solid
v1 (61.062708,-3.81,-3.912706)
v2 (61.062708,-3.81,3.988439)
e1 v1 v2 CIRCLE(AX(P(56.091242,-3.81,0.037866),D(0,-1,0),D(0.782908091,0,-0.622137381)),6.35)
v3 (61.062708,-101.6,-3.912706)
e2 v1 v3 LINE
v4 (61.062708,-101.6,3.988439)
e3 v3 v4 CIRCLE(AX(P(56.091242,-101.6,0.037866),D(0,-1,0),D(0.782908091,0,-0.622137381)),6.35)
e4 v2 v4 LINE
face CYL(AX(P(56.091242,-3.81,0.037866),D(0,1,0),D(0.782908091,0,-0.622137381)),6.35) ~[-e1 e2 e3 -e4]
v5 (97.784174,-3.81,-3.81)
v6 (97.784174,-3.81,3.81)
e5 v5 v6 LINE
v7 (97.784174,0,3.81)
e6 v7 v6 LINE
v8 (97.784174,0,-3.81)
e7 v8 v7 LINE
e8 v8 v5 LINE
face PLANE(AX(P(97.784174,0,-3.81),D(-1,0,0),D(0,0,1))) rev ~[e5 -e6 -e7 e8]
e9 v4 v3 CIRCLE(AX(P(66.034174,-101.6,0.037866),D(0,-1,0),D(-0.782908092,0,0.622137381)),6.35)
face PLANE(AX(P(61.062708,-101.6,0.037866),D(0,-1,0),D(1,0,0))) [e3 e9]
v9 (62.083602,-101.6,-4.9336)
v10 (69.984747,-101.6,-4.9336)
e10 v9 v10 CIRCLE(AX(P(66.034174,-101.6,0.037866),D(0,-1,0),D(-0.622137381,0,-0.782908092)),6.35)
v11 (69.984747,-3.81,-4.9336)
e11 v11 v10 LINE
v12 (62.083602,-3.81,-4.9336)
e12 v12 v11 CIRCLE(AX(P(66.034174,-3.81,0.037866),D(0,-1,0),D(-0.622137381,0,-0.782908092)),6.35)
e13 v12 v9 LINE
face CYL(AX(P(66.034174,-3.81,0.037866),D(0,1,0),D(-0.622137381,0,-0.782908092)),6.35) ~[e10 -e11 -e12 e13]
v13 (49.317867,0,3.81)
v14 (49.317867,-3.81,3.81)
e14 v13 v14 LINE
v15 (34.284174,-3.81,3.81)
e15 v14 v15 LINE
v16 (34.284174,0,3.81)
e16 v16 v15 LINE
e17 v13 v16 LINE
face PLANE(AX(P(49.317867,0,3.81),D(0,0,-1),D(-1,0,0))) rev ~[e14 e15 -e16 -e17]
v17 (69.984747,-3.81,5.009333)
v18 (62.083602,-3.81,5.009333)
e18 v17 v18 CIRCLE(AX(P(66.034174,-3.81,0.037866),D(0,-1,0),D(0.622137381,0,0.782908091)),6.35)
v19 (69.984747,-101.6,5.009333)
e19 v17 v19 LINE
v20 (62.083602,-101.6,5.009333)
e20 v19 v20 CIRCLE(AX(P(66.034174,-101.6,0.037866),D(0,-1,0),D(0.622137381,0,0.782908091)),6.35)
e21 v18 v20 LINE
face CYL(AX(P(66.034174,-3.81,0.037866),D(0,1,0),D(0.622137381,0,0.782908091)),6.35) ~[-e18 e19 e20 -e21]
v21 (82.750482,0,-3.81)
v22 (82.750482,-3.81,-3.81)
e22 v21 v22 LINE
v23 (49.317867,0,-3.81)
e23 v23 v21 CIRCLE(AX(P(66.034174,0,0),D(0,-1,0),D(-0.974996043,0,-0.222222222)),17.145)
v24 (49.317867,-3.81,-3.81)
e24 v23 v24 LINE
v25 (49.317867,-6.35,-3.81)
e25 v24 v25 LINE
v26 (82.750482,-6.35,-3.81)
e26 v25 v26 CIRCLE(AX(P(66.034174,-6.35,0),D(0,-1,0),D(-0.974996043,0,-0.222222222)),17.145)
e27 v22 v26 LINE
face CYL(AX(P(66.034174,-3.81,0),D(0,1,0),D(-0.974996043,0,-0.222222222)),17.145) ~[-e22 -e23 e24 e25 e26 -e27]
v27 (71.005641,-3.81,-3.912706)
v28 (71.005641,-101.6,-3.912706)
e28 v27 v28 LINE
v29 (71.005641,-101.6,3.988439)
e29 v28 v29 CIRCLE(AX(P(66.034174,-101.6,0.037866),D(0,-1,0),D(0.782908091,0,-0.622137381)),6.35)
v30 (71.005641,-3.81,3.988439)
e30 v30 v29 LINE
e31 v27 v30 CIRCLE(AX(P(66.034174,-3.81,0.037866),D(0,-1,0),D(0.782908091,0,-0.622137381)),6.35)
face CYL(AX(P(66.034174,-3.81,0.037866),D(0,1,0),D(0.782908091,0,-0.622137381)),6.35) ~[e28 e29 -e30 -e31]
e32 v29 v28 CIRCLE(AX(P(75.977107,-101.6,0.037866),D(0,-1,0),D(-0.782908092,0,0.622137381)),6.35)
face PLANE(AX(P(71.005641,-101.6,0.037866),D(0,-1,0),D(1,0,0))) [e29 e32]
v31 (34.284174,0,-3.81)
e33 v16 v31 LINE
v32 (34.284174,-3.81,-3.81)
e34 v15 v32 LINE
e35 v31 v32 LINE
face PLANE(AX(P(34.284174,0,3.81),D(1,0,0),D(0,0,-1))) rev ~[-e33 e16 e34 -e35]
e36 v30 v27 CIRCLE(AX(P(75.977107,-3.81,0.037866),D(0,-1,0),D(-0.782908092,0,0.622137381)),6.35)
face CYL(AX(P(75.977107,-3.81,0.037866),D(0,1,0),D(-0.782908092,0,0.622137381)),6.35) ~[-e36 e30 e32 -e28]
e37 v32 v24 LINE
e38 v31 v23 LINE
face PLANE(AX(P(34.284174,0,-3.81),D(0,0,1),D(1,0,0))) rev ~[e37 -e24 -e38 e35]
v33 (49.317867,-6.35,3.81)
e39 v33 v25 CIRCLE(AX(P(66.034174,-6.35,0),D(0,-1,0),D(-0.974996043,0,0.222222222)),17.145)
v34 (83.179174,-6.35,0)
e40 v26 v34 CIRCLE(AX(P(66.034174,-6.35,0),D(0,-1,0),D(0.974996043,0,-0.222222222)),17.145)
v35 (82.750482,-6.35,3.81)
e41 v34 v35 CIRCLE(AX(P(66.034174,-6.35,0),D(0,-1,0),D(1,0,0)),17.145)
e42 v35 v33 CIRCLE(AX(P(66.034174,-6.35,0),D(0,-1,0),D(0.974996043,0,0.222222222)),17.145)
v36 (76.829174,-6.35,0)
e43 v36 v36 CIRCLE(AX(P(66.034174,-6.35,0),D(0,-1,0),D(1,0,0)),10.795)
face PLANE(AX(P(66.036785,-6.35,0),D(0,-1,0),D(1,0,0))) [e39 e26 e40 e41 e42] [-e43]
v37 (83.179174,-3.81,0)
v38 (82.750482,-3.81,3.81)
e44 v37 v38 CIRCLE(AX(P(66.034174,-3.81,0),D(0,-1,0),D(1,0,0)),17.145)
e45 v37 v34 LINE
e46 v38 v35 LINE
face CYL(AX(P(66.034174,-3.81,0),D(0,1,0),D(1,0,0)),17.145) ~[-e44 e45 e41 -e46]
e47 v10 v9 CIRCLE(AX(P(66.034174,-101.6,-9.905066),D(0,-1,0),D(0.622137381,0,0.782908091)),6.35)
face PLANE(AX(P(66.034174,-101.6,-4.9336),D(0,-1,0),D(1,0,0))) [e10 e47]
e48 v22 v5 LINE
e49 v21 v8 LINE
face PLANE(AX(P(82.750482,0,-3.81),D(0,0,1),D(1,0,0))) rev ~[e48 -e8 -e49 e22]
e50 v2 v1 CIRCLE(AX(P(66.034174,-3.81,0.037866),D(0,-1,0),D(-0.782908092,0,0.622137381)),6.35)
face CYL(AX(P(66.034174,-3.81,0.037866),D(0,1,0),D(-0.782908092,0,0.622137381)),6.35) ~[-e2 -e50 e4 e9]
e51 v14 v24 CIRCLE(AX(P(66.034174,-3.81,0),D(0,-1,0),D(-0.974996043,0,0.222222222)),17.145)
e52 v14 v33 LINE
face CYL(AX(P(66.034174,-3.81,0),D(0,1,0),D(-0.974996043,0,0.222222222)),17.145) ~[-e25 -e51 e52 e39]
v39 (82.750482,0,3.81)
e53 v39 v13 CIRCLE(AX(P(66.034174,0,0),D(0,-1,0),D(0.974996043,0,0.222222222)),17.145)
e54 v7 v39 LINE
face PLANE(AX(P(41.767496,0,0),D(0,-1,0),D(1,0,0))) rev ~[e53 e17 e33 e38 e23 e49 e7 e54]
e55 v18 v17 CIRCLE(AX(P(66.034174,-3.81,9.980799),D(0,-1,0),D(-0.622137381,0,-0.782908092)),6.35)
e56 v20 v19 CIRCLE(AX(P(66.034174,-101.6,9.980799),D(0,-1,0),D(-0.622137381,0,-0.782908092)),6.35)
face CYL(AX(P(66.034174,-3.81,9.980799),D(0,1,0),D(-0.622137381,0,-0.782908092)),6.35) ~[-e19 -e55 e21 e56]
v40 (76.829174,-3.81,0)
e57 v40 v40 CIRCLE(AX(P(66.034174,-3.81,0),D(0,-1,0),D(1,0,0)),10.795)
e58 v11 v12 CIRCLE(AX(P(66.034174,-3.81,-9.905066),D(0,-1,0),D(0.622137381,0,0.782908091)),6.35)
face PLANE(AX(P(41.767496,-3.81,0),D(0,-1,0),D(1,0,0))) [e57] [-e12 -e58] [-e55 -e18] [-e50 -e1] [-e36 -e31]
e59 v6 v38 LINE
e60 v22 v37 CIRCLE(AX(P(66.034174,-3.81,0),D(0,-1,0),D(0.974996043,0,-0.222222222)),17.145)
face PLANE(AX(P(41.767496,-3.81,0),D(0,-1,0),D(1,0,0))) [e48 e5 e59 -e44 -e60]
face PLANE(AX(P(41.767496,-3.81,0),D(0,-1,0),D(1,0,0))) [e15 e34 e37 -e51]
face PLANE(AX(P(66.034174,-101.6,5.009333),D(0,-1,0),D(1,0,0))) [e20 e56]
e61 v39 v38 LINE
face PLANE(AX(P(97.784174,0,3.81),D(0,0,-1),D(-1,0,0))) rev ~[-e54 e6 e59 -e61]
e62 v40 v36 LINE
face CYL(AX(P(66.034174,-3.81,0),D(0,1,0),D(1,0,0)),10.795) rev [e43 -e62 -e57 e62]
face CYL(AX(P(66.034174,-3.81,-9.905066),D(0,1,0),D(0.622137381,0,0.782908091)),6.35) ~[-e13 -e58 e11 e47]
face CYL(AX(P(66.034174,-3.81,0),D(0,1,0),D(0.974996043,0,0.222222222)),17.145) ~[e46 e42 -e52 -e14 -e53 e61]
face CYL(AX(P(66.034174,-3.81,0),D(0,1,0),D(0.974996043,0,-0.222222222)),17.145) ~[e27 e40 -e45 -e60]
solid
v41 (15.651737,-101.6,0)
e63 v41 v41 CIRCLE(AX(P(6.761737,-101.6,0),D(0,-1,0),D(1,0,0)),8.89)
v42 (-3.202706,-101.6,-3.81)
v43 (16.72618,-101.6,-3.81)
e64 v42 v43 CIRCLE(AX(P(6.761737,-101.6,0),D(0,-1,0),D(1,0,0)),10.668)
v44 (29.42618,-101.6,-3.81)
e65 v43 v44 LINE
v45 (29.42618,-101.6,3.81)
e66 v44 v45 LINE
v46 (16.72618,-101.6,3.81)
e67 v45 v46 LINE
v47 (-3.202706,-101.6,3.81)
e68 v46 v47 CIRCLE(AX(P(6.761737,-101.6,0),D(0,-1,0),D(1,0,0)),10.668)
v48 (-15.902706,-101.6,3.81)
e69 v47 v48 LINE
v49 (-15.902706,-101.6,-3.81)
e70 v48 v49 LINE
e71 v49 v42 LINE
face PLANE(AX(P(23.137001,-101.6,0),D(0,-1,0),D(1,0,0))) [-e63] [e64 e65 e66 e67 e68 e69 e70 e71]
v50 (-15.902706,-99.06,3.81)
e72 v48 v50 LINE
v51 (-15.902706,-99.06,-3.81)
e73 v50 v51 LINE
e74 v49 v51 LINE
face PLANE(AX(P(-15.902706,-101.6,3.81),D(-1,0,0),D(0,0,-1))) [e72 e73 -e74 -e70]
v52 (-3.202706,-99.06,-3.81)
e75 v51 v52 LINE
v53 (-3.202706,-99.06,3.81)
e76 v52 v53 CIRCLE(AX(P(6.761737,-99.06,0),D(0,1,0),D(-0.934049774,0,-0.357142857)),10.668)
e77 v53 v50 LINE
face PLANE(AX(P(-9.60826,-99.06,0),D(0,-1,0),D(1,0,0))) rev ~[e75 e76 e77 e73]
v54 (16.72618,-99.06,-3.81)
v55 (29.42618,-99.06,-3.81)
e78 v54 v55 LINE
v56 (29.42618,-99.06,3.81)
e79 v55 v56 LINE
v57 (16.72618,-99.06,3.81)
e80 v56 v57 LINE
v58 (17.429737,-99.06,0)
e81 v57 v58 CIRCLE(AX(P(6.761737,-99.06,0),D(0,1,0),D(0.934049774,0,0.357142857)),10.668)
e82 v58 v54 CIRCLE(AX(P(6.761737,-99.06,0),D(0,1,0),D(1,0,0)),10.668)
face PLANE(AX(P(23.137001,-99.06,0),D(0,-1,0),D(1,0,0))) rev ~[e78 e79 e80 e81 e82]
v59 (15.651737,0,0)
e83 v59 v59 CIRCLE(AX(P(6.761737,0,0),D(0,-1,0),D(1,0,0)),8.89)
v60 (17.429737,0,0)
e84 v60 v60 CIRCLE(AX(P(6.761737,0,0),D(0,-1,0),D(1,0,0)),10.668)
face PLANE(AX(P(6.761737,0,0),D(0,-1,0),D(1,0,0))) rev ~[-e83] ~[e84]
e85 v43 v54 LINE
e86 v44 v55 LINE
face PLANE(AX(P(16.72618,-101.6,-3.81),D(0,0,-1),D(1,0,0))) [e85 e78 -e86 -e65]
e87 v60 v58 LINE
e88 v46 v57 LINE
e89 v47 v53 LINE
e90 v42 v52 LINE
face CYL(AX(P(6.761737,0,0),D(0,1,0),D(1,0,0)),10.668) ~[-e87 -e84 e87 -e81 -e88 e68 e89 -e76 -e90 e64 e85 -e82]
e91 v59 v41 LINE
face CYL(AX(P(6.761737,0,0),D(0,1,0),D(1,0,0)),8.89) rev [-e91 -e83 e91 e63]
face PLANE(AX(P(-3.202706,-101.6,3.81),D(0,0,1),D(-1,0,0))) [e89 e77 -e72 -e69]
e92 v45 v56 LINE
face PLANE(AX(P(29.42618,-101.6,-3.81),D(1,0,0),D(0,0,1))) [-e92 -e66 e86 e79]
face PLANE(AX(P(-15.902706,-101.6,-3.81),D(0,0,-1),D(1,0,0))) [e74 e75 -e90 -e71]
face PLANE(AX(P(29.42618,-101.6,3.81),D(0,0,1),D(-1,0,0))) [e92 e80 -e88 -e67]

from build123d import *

# Parameters (mm, degrees)
F0_R      = 15.875
F1_DEPTH  = 3.81
F2_R      = 10.795
F3_DEPTH  = 2.54
F4_R      = 10.668
F4_R_2    = 8.89
F5_DEPTH  = 101.6
F8_DEPTH  = 2.54
F11_DEPTH = 97.79


# Not quite as in the source:
# - a feature names something its author has since deleted; it is built from what else it names


with BuildPart() as f1:
    # F0 (on Front) → F1 (new body)
    with BuildSketch(Plane.XZ):
        with BuildLine():
            Line((34.2841744423, 3.81), (34.2841744423, 0))
            Line((34.2841744423, 0), (34.2841744423, -3.81))
            Line((34.2841744423, -3.81), (49.3178672843, -3.81))
            ThreePointArc((49.3178672843, -3.81), (48.8891744423, 0), (49.3178672843, 3.81))
            Line((49.3178672843, 3.81), (34.2841744423, 3.81))
        make_face()
        with BuildLine():
            Line((97.7841744423, 3.81), (82.7504816003, 3.81))
            ThreePointArc((82.7504816003, 3.81), (83.0716641521, 1.9170209671), (83.1791744423, 0))
            ThreePointArc((83.1791744423, 0), (83.0716641521, -1.9170209671), (82.7504816003, -3.81))
            Line((82.7504816003, -3.81), (97.7841744423, -3.81))
            Line((97.7841744423, -3.81), (97.7841744423, 0))
            Line((97.7841744423, 0), (97.7841744423, 3.81))
        make_face()
        with BuildLine():
            ThreePointArc((82.7504816003, 3.81), (66.0341744423, 17.145), (49.3178672843, 3.81))
            ThreePointArc((49.3178672843, 3.81), (48.8891744423, 0), (49.3178672843, -3.81))
            ThreePointArc((49.3178672843, -3.81), (66.0341744423, -17.145), (82.7504816003, -3.81))
            ThreePointArc((82.7504816003, -3.81), (83.0716641521, -1.9170209671), (83.1791744423, 0))
            ThreePointArc((83.1791744423, 0), (83.0716641521, 1.9170209671), (82.7504816003, 3.81))
        make_face()
        with Locations((66.0341744423, 0)):
            Circle(F0_R, mode=Mode.SUBTRACT)
        with Locations((66.0341744423, 0)):
            Circle(F0_R)
    extrude(amount=F1_DEPTH)

    # F2 (on face) → F3 (join)
    with BuildSketch(Plane.XZ.offset(3.81)):
        with BuildLine():
            ThreePointArc((82.7504816003, 3.81), (66.0341744423, 17.145), (49.3178672843, 3.81))
            ThreePointArc((49.3178672843, 3.81), (48.8891744423, 0), (49.3178672843, -3.81))
            ThreePointArc((49.3178672843, -3.81), (66.0341744423, -17.145), (82.7504816003, -3.81))
            ThreePointArc((82.7504816003, -3.81), (83.0716641521, -1.9170209671), (83.1791744423, 0))
            ThreePointArc((83.1791744423, 0), (83.0716641521, 1.9170209671), (82.7504816003, 3.81))
        make_face()
        with Locations((66.0341744423, 0)):
            Circle(F2_R, mode=Mode.SUBTRACT)
    extrude(amount=F3_DEPTH)

    # F10 (on face) → F11 (join)
    with BuildSketch(Plane.XZ.offset(3.81)):
        with BuildLine():
            ThreePointArc((61.0627080612, -3.9127058819), (62.4412416802, 0.0378664845), (61.0627080612, 3.9884388509))
            ThreePointArc((61.0627080612, 3.9884388509), (59.6841744423, 0.0378664845), (61.0627080612, -3.9127058819))
        make_face()
        with BuildLine():
            ThreePointArc((62.0836020759, 5.0093328655), (66.0341744423, 3.6307992466), (69.9847468087, 5.0093328655))
            ThreePointArc((69.9847468087, 5.0093328655), (66.0341744423, 6.3878664845), (62.0836020759, 5.0093328655))
        make_face()
        with BuildLine():
            ThreePointArc((69.9847468087, -4.9335998966), (66.0341744423, -3.5550662776), (62.0836020759, -4.9335998966))
            ThreePointArc((62.0836020759, -4.9335998966), (66.0341744423, -6.3121335155), (69.9847468087, -4.9335998966))
        make_face()
        with BuildLine():
            ThreePointArc((71.0056408233, 3.9884388509), (69.6271072044, 0.0378664845), (71.0056408233, -3.9127058819))
            ThreePointArc((71.0056408233, -3.9127058819), (72.3841744423, 0.0378664845), (71.0056408233, 3.9884388509))
        make_face()
    extrude(amount=F11_DEPTH)


with BuildPart() as f5:
    # F4 (on Front) → F5 (new body)
    with BuildSketch(Plane.XZ):
        with Locations((6.7617367022, 0)):
            Circle(F4_R)
        with Locations((6.7617367022, 0)):
            Circle(F4_R_2, mode=Mode.SUBTRACT)
    extrude(amount=F5_DEPTH)

    # F7 (on face) → F8 (join)
    with BuildSketch(Plane.XZ.offset(101.6)):
        with BuildLine():
            ThreePointArc((-3.2027062828, -3.81), (-3.9062632978, 0), (-3.2027062828, 3.81))
            Line((-3.2027062828, 3.81), (-15.9027062828, 3.81))
            Line((-15.9027062828, 3.81), (-15.9027062828, -3.81))
            Line((-15.9027062828, -3.81), (-3.2027062828, -3.81))
        make_face()
        with BuildLine():
            Line((29.4261796871, 3.81), (16.7261796871, 3.81))
            ThreePointArc((16.7261796871, 3.81), (17.2523730452, 1.9372075569), (17.4297367022, 0))
            ThreePointArc((17.4297367022, 0), (17.2523730452, -1.9372075569), (16.7261796871, -3.81))
            Line((16.7261796871, -3.81), (29.4261796871, -3.81))
            Line((29.4261796871, -3.81), (29.4261796871, 3.81))
        make_face()
    extrude(amount=-F8_DEPTH)


solid = Compound([f1.part, f5.part])
